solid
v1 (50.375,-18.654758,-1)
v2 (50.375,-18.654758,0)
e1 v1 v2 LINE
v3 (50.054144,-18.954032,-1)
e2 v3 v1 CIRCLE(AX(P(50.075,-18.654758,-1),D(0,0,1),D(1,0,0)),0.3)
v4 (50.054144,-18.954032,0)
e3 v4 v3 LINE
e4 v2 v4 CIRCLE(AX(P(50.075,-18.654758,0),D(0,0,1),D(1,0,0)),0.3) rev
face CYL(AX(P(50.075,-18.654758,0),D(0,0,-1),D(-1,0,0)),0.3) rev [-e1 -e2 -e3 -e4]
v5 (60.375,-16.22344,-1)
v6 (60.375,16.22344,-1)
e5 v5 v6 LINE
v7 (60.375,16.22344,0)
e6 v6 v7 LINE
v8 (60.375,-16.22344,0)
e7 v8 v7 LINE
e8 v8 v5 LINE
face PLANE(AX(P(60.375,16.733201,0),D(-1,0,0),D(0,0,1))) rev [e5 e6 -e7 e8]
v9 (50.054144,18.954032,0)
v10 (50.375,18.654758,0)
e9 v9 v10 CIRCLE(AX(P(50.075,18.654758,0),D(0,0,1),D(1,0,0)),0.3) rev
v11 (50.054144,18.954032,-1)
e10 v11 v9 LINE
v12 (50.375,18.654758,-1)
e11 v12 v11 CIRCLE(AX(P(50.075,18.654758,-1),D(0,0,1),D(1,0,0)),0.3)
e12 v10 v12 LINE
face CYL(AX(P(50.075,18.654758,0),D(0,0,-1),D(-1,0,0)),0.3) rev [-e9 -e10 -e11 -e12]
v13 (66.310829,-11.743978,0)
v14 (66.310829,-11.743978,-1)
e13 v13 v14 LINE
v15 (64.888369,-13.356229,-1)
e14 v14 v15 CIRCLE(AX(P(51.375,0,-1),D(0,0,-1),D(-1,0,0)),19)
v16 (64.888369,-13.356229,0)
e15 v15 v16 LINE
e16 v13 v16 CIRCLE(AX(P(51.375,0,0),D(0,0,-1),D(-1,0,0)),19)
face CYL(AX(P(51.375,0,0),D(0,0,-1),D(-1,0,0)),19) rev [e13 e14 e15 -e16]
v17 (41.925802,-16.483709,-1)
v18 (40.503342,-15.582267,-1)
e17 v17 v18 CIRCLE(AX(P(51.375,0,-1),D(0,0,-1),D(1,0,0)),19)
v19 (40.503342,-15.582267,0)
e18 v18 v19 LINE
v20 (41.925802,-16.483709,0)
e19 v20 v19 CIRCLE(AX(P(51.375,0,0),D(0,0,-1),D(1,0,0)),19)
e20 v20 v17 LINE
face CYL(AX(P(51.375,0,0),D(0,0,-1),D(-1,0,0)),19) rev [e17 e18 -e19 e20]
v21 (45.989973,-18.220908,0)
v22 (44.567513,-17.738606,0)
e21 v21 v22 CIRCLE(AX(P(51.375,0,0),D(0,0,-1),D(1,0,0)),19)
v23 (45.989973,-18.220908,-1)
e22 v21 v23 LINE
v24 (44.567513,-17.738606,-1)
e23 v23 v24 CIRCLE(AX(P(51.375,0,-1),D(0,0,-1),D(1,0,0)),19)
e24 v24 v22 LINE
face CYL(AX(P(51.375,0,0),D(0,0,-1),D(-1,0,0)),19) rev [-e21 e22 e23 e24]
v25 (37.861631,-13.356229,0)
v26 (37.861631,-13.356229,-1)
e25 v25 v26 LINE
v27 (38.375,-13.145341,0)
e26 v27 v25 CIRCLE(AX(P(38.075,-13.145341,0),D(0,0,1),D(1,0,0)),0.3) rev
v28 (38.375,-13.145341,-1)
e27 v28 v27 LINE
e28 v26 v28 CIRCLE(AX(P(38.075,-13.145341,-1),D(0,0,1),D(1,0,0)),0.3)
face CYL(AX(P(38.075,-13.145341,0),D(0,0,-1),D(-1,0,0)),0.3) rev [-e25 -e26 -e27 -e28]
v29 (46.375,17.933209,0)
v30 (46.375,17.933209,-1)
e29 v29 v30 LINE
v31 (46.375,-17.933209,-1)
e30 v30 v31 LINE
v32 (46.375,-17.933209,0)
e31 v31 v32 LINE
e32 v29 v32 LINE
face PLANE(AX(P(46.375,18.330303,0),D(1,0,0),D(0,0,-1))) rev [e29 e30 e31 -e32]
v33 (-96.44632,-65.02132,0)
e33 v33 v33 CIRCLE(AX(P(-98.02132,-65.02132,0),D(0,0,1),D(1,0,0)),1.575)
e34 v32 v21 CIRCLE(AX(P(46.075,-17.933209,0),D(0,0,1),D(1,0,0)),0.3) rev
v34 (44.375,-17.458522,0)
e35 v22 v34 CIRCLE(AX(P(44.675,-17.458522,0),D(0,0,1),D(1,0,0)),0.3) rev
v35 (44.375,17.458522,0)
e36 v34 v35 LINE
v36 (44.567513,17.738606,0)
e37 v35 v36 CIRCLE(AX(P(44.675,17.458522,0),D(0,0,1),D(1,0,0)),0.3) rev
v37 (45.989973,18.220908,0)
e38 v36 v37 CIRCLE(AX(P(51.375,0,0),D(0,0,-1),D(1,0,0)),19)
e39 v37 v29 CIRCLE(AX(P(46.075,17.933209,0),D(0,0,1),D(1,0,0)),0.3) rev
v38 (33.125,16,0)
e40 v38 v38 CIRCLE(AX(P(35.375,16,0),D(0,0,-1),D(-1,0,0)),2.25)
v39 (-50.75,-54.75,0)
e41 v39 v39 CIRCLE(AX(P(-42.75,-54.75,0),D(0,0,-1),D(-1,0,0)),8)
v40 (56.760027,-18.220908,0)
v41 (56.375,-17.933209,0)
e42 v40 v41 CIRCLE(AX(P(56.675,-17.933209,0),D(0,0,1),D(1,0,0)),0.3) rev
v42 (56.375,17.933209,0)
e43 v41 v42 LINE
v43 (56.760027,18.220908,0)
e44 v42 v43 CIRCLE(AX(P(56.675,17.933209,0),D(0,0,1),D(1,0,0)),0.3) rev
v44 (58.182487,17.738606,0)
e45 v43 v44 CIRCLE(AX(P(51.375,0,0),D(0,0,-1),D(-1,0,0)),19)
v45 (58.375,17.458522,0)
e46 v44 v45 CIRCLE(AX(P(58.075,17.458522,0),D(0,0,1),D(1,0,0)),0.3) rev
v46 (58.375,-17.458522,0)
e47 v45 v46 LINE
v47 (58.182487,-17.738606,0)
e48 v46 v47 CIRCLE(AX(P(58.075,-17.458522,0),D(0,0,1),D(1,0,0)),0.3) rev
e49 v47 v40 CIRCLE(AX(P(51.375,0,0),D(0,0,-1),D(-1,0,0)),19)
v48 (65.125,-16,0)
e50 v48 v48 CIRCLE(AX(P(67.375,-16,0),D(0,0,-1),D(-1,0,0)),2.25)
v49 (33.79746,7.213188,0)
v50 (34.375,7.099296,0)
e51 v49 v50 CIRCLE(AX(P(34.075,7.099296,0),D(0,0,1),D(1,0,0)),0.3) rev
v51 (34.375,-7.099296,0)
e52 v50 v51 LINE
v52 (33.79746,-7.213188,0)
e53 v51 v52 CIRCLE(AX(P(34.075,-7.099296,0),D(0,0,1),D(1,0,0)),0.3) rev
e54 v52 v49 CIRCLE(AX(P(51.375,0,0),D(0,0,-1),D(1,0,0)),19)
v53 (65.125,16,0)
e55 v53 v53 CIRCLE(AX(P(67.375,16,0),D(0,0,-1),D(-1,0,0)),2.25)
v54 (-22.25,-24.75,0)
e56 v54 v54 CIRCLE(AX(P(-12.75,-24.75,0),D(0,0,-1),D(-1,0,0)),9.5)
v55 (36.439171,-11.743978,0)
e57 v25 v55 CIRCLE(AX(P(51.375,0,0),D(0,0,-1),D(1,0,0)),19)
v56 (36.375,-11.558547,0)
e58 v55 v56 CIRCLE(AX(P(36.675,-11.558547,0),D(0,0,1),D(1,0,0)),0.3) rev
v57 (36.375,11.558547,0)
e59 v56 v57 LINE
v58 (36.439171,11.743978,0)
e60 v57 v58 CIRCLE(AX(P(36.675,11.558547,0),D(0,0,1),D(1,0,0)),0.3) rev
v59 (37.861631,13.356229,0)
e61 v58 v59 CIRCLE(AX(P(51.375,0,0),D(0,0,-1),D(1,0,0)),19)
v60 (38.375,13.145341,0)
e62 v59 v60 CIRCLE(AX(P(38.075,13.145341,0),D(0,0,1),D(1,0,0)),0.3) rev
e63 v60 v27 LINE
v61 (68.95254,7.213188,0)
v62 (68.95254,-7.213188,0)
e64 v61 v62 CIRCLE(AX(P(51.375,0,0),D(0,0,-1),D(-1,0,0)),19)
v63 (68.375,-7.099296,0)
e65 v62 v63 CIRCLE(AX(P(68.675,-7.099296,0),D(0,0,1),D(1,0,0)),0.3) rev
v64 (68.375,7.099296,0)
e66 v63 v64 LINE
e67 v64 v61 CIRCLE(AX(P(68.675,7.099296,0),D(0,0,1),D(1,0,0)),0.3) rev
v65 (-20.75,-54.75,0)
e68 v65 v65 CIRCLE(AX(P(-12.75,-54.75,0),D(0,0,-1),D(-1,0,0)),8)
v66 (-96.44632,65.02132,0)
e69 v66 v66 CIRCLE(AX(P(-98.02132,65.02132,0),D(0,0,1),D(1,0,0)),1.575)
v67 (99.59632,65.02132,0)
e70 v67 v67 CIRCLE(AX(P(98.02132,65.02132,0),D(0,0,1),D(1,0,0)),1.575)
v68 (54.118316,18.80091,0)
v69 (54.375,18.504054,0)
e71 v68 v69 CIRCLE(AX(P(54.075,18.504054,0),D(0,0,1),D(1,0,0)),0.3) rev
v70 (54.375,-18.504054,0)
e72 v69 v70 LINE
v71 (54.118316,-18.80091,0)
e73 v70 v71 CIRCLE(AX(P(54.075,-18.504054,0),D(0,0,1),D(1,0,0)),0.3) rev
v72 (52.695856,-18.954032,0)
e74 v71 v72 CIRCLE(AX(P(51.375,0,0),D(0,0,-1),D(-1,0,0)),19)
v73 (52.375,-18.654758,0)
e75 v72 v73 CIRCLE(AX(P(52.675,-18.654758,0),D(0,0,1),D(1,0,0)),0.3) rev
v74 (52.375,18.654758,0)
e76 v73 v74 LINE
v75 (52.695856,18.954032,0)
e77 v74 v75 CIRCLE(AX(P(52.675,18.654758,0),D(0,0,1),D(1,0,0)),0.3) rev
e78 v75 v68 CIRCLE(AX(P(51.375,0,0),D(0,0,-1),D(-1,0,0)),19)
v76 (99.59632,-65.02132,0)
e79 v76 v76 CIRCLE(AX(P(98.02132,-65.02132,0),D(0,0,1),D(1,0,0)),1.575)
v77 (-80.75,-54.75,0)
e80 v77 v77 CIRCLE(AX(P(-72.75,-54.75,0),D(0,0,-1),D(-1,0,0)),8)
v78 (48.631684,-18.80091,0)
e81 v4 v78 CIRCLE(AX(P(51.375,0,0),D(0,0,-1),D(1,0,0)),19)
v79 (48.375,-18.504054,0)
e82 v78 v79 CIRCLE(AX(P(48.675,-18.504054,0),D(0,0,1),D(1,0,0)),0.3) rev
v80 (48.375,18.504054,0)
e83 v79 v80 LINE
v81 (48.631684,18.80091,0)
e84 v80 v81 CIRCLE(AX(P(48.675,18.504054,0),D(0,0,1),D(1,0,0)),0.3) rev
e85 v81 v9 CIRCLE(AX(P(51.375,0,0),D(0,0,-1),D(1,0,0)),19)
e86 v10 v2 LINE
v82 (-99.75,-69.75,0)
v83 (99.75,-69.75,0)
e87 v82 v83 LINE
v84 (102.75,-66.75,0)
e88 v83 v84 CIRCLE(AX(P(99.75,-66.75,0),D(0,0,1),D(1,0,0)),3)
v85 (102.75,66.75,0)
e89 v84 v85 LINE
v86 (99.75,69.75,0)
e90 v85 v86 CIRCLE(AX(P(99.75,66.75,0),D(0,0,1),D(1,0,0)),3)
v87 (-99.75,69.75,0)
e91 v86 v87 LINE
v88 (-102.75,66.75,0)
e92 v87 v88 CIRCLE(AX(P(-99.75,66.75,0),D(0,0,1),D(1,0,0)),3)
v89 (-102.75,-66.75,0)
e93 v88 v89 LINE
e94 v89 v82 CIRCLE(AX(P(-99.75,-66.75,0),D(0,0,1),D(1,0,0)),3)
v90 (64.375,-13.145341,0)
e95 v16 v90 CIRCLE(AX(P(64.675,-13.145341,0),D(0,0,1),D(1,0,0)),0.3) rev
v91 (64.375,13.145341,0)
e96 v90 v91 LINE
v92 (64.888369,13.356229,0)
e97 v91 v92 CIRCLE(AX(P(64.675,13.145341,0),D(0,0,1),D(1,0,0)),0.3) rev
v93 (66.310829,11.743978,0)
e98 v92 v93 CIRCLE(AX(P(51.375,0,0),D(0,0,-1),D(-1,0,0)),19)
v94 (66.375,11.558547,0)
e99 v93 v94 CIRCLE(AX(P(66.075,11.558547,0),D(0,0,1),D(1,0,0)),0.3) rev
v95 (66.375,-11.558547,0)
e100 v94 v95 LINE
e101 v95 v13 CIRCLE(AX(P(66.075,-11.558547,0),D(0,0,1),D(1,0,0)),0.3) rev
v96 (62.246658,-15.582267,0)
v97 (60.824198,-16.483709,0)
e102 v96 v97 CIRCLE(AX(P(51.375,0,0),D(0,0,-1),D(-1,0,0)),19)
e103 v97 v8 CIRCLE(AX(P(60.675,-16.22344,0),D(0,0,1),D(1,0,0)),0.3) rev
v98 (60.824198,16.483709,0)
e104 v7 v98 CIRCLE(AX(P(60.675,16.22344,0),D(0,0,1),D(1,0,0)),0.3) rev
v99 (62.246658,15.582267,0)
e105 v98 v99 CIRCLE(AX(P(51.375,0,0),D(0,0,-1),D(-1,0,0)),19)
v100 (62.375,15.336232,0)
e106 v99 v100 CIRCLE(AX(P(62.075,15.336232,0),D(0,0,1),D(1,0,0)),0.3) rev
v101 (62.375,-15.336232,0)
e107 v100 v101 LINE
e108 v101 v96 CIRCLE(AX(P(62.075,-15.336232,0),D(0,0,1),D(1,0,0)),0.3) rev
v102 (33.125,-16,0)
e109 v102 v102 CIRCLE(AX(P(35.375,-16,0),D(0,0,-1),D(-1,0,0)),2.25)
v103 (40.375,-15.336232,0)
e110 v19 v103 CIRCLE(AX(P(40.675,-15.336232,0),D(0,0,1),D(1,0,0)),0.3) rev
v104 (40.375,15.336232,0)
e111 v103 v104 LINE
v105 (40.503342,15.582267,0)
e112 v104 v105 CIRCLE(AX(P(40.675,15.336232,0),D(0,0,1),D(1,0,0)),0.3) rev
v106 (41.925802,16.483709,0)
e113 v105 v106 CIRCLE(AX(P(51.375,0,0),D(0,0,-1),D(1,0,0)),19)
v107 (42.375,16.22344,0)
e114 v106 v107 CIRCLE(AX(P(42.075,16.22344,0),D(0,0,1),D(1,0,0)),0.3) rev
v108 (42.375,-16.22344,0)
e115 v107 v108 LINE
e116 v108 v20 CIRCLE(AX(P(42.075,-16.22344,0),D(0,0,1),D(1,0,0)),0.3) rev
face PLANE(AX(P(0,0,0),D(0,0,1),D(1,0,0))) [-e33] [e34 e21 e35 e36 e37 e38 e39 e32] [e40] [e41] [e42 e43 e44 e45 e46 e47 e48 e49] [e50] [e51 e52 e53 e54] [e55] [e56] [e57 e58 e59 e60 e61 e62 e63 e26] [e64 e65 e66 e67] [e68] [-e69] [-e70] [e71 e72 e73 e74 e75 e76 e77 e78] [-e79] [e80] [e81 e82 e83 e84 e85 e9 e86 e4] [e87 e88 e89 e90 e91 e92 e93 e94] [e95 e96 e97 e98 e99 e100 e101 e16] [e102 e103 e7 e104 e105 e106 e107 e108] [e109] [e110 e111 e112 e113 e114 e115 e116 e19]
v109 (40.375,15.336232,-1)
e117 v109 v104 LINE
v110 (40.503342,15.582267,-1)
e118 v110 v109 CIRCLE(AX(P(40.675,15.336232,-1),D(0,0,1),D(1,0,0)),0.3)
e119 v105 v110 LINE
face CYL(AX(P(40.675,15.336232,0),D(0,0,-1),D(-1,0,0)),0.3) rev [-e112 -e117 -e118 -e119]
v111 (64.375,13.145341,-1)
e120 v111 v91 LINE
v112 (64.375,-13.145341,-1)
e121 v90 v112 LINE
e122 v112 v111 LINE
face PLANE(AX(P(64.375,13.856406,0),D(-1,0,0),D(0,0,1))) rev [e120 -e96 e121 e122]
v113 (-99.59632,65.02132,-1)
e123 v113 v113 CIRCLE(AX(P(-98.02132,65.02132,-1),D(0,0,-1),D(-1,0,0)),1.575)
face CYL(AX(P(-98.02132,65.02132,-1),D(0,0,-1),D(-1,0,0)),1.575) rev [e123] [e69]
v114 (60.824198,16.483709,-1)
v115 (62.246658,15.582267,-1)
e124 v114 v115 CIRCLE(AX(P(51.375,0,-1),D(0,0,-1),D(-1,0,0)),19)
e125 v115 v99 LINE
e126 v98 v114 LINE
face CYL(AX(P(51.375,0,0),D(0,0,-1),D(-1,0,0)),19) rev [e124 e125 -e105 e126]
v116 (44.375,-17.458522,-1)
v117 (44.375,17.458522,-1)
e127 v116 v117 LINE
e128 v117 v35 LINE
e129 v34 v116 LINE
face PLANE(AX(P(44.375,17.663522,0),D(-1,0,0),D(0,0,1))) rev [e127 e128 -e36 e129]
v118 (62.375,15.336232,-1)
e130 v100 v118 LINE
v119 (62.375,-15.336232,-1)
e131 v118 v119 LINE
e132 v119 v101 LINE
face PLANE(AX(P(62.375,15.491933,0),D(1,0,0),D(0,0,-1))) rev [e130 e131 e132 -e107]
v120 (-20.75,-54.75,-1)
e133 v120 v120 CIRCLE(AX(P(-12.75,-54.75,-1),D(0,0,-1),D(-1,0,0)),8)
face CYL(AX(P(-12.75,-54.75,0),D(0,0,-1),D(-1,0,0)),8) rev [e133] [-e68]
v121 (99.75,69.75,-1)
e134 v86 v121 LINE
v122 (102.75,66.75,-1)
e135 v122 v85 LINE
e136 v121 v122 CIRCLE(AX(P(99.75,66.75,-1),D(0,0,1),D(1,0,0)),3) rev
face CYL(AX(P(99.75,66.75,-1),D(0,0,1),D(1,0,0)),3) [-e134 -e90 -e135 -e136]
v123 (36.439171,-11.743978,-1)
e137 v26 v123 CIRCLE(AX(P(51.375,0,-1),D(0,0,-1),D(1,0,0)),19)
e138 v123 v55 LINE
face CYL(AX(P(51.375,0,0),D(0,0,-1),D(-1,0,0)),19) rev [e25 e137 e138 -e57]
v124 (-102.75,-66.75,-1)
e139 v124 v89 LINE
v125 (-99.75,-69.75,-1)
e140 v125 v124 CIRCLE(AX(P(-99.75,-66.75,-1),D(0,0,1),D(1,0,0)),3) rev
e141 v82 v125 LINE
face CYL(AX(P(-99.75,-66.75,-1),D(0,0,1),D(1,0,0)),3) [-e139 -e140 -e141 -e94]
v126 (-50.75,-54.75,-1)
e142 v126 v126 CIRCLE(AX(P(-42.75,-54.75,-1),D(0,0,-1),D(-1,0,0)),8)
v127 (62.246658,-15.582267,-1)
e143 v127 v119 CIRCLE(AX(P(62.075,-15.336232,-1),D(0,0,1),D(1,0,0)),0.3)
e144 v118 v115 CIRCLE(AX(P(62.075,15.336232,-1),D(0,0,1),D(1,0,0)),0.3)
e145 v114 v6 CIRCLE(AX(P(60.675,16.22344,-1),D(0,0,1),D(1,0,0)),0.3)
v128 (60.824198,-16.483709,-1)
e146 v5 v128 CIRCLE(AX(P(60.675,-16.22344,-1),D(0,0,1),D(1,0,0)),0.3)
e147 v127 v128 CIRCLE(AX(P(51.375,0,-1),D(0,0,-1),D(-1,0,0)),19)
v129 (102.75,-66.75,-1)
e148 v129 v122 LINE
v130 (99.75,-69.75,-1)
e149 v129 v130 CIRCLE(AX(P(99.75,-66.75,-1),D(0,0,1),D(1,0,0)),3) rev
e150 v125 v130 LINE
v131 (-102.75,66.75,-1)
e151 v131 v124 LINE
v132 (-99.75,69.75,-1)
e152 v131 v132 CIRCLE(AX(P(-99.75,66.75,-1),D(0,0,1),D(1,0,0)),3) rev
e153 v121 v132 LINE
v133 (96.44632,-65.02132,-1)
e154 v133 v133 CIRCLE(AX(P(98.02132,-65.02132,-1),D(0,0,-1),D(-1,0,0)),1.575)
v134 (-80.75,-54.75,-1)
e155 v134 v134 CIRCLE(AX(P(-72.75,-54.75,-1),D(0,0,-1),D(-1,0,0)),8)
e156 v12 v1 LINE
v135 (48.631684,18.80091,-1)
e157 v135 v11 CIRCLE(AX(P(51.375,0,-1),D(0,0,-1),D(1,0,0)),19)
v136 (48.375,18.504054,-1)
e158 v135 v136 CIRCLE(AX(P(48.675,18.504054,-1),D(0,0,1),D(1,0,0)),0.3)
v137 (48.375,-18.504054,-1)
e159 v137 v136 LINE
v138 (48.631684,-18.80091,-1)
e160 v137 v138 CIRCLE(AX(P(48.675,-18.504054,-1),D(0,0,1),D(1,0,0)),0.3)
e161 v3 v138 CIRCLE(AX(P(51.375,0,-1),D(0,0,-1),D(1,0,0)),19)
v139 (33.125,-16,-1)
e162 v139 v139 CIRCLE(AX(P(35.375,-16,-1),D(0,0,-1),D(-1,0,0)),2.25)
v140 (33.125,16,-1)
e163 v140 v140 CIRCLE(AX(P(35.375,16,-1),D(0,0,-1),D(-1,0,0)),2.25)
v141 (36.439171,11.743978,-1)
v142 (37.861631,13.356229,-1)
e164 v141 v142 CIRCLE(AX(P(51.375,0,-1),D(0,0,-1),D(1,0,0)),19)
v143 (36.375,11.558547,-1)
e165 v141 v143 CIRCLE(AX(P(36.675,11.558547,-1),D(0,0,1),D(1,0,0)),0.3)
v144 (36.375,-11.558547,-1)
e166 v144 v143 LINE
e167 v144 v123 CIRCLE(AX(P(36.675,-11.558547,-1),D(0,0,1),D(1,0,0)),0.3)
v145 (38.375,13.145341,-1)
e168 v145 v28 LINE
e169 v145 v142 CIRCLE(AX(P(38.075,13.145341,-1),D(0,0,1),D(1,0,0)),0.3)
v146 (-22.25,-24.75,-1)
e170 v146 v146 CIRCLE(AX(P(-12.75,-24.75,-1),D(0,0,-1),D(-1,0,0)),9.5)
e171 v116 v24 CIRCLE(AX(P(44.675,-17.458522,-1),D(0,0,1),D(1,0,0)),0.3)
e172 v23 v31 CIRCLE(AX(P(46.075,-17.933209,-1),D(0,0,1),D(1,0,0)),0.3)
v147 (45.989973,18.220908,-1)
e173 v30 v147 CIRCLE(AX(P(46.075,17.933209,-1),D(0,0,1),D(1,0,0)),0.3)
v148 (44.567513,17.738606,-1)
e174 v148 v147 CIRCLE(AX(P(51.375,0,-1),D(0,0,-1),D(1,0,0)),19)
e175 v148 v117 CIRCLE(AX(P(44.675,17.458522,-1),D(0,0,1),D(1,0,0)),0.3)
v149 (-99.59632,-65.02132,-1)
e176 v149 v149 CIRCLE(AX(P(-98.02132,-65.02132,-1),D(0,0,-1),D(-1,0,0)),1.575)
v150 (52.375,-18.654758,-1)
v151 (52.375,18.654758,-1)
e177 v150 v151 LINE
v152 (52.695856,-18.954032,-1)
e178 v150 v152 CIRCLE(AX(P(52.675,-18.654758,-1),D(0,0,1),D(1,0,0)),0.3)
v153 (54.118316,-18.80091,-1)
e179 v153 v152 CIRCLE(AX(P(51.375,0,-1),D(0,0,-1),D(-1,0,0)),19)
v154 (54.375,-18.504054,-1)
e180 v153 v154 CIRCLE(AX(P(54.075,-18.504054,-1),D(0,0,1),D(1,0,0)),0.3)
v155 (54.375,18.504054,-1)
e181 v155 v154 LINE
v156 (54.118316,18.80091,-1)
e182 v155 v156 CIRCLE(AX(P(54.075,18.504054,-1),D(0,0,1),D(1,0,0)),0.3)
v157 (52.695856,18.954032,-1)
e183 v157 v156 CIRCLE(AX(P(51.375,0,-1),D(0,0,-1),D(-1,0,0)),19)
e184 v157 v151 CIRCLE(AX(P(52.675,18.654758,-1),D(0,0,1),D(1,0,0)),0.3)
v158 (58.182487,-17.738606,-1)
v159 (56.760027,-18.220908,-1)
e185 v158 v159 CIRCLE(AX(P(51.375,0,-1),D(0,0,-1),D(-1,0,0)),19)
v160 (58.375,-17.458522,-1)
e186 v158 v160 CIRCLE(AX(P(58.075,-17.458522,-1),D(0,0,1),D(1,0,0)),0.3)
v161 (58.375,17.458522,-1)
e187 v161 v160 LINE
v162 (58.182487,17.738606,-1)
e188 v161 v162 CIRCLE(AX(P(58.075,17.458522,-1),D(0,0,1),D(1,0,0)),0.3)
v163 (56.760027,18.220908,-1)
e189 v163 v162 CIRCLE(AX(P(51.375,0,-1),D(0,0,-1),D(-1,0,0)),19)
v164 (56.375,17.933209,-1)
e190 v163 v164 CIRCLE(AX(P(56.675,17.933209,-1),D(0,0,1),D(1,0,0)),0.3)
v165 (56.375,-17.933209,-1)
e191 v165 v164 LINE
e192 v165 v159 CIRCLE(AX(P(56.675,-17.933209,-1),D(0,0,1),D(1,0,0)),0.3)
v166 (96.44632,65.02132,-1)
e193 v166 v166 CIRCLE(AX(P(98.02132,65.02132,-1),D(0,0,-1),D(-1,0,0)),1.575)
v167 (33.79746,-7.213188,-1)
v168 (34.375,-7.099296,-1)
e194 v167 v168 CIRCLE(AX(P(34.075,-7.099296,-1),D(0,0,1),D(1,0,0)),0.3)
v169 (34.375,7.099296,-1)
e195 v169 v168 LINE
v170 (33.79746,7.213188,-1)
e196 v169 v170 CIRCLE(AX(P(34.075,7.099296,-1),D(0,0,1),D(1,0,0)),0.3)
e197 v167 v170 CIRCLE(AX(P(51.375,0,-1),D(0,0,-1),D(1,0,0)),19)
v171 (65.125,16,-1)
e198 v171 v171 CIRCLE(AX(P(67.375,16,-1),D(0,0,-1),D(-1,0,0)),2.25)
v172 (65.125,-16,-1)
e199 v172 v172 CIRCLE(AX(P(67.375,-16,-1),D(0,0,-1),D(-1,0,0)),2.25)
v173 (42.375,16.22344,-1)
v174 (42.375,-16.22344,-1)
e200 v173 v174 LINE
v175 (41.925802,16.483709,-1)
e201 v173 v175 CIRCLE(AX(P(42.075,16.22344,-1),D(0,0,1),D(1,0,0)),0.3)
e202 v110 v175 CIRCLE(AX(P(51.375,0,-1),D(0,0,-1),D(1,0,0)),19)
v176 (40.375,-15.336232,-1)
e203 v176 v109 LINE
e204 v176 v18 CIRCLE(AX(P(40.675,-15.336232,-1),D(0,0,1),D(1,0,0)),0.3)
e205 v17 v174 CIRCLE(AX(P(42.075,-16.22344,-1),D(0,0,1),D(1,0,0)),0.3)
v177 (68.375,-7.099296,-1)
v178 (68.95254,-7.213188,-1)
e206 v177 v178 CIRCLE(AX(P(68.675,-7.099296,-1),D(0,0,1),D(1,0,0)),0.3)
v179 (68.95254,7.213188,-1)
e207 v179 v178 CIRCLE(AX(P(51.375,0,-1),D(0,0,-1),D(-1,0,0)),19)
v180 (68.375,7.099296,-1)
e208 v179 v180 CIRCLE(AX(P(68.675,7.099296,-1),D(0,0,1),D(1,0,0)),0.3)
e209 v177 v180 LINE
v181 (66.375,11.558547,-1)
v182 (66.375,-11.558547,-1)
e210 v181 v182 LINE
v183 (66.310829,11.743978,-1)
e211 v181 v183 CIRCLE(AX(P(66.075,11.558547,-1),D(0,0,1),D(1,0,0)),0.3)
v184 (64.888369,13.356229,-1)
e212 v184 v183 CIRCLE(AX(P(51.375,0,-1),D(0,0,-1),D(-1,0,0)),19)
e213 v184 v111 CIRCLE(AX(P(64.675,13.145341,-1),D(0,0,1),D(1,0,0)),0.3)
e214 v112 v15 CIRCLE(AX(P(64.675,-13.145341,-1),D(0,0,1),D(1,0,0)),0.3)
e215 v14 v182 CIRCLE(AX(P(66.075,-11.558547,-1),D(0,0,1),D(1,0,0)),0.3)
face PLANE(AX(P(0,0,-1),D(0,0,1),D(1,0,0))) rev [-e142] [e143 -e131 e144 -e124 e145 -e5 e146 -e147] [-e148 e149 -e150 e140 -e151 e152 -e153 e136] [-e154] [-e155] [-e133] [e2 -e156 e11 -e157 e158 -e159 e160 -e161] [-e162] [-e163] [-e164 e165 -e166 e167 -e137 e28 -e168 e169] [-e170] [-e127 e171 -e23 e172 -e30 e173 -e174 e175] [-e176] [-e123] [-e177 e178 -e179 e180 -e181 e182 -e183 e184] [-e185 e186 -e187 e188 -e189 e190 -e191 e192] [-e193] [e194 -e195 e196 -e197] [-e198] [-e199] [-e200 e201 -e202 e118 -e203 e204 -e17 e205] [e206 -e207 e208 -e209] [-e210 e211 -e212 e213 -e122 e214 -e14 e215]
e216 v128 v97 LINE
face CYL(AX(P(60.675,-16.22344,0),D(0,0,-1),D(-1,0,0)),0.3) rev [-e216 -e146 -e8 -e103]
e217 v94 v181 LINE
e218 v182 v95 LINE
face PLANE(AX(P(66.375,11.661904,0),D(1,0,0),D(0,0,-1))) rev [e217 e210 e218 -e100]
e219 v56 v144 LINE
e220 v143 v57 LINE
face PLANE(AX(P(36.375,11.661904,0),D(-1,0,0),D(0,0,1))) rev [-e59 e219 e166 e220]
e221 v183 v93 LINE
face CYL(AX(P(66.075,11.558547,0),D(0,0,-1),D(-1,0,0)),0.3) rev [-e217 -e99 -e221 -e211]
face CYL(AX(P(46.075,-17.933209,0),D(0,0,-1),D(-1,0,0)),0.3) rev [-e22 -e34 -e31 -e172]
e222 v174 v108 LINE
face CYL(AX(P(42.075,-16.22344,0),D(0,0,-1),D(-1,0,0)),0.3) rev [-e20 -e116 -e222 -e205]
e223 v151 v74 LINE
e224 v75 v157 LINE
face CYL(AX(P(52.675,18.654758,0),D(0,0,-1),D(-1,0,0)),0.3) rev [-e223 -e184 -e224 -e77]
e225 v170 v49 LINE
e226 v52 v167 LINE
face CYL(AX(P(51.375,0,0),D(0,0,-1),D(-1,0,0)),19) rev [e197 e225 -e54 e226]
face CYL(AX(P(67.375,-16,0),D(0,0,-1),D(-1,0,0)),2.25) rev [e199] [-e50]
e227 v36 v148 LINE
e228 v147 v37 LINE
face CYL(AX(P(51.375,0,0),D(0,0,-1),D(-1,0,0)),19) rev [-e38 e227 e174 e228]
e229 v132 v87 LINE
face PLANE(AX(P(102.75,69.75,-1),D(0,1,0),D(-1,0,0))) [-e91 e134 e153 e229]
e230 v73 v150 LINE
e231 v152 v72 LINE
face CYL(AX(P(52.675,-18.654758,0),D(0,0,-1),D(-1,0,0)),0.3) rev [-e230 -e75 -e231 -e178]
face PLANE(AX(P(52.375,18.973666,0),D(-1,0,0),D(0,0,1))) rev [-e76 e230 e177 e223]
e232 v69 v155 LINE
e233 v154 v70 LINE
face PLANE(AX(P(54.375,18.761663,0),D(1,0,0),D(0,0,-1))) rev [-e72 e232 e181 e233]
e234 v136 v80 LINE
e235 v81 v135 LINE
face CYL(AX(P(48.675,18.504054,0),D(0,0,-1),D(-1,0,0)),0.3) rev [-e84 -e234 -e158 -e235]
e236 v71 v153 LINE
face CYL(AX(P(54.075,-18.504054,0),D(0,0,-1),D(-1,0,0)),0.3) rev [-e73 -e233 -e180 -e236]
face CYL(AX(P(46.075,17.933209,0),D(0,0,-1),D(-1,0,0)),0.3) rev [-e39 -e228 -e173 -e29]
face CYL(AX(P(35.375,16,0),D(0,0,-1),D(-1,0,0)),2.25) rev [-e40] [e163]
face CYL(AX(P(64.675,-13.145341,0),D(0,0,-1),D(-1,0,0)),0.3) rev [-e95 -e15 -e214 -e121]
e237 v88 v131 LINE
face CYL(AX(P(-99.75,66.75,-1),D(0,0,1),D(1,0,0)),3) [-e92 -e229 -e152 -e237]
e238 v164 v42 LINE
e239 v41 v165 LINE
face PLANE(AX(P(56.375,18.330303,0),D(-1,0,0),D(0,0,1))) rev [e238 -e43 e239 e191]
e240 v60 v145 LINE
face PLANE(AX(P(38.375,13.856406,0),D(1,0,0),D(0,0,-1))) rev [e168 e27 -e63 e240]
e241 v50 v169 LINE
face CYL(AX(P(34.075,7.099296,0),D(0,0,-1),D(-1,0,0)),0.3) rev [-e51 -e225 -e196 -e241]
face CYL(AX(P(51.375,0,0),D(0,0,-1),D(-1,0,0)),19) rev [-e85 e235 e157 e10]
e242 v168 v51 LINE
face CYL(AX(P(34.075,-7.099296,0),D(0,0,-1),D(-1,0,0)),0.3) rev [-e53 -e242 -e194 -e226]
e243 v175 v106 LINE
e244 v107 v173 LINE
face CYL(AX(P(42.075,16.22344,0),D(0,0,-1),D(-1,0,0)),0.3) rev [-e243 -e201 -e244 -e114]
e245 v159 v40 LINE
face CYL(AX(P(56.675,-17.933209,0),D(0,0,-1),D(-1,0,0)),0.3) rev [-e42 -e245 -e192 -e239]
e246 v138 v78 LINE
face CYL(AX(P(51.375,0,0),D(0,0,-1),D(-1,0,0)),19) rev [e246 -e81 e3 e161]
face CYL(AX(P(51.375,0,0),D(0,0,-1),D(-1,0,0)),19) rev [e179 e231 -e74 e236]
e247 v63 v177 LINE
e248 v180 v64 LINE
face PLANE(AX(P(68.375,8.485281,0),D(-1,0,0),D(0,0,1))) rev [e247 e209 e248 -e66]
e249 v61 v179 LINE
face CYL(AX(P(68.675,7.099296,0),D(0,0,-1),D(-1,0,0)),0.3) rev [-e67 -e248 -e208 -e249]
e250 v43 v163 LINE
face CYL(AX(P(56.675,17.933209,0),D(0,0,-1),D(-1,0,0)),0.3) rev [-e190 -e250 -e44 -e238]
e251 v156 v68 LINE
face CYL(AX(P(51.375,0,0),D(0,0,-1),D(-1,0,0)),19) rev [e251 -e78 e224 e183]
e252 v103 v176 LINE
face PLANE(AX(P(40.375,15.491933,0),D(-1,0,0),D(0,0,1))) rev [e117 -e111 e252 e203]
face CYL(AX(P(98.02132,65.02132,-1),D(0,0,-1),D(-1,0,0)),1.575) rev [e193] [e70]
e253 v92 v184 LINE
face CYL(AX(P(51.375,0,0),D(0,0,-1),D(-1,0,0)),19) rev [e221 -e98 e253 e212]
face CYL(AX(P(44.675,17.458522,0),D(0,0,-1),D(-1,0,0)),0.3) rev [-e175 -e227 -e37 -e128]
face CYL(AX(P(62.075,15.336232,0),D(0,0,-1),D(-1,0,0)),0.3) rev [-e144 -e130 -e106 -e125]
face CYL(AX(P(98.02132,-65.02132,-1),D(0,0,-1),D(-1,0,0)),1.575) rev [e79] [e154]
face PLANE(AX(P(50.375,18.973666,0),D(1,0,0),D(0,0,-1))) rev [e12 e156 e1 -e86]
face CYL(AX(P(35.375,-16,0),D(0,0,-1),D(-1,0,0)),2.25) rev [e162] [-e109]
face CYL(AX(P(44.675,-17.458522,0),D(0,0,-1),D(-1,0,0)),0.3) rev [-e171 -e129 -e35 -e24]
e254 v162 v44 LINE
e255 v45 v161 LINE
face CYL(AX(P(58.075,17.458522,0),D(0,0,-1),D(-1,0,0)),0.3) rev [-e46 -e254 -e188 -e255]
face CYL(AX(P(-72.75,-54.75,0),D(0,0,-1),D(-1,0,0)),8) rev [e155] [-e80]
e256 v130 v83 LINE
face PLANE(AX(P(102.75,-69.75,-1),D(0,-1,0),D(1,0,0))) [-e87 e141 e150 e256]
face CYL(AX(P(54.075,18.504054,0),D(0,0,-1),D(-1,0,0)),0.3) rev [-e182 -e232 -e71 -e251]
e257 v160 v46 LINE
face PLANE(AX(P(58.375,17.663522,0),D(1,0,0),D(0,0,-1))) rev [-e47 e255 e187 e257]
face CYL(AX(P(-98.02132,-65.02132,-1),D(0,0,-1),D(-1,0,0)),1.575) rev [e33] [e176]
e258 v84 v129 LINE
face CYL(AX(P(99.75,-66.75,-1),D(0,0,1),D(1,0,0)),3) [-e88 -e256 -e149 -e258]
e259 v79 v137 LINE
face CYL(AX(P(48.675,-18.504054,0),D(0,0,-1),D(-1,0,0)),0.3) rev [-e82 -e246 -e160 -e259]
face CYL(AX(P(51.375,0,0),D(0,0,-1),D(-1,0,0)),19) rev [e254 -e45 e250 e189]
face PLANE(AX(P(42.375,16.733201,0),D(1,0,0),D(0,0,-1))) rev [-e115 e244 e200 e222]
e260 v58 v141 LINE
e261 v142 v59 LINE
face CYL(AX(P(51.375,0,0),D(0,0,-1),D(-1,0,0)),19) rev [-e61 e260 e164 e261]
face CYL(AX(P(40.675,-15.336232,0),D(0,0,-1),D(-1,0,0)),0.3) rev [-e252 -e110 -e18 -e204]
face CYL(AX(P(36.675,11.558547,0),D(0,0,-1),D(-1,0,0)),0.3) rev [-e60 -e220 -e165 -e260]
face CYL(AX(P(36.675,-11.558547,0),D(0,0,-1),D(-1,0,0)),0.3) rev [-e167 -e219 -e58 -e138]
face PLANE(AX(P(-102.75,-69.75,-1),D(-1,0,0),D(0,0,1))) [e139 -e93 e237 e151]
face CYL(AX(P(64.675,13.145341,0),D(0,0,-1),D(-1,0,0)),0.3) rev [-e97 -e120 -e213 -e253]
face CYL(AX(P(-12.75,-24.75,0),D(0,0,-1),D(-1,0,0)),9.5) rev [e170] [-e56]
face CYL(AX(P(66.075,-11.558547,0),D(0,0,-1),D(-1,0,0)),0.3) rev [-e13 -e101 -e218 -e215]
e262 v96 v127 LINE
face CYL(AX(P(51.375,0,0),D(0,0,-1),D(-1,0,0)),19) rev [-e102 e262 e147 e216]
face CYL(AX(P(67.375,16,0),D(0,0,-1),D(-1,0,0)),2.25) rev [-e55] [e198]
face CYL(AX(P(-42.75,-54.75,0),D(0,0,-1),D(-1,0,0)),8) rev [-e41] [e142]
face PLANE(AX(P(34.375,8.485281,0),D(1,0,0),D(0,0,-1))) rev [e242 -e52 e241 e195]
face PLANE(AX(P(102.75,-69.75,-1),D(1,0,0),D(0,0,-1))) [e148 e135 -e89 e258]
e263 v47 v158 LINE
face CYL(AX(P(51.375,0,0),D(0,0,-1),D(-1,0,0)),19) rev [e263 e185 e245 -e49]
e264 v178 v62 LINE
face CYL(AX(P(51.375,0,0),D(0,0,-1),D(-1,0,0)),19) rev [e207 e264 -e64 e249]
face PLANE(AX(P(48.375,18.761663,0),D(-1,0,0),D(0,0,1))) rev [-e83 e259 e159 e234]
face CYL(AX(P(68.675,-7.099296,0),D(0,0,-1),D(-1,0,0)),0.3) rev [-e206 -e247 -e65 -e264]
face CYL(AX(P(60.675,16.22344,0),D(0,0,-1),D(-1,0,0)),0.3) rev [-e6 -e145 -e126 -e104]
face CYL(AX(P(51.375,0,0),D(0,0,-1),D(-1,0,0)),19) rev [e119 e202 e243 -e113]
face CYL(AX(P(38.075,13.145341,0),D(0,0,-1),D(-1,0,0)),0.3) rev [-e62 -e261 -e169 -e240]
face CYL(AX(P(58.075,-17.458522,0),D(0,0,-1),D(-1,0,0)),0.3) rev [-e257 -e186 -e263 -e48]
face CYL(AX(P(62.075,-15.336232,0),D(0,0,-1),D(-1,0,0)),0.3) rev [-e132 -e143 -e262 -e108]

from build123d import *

# Parameters (mm, degrees)
SKETCH_2_W             = 205.5
SKETCH_2_H             = 139.5
SM_BASE_FLANGE_1_DEPTH = 1
FILLET_1_R             = 3
HOLE_WIZARD_M31_D      = 3.15
HOLE_WIZARD_M31_DEPTH  = 8.5
HOLE_WIZARD_M31_TIP    = 0.946355475
SKETCH_9_R             = 2.25
CUT_EXTRUDE_3_DEPTH    = 1
CUT_EXTRUDE_4_DEPTH    = 1
SKETCH_8_R             = 8
CUT_EXTRUDE_1_DEPTH    = 10
SKETCH_10_R            = 9.5
CUT_EXTRUDE_2_DEPTH    = 1
FILLET_2_R             = 0.3


# Sheet-metal steps are written as plain solids
with BuildPart() as part:
    # Sketch 2 → Базовая кромка1 (new body)
    with BuildSketch(Plane.XY):
        Rectangle(SKETCH_2_W, SKETCH_2_H)
    extrude(amount=-SM_BASE_FLANGE_1_DEPTH)

    # Скругление1
    fillet_1_edges = [part.edges().sort_by_distance(p)[0] for p in [
        (-102.75, 69.75, -0.5),
        (102.75, 69.75, -0.5),
        (102.75, -69.75, -0.5),
        (-102.75, -69.75, -0.5),
    ]]
    fillet(fillet_1_edges, radius=FILLET_1_R)

    # Сверло под метчик  спиральное M31
    with Locations(Plane(origin=(0, 0, -1), x_dir=(-1, 0, 0), z_dir=(0, 0, -1))):
        with Locations((-98.021320344, 65.021320344), (98.021320344, 65.021320344), (98.021320344, -65.021320344), (-98.021320344, -65.021320344)):
            Hole(HOLE_WIZARD_M31_D / 2, depth=HOLE_WIZARD_M31_DEPTH)
            with Locations((0, 0, -(HOLE_WIZARD_M31_DEPTH + HOLE_WIZARD_M31_TIP / 2))):  # 118° drill point
                Cone(0, HOLE_WIZARD_M31_D / 2, HOLE_WIZARD_M31_TIP, mode=Mode.SUBTRACT)

    # Эскиз9 → Вырез-Вытянуть3 (cut)
    with BuildSketch(Plane(origin=(0, 0, -1), x_dir=(-1, 0, 0), z_dir=(0, 0, -1))):
        with Locations((-67.375, 16)):
            Circle(SKETCH_9_R)
        with Locations((-35.375, 16)):
            Circle(SKETCH_9_R)
        with Locations((-35.375, -16)):
            Circle(SKETCH_9_R)
        with Locations((-67.375, -16)):
            Circle(SKETCH_9_R)
    extrude(amount=-CUT_EXTRUDE_3_DEPTH, mode=Mode.SUBTRACT)

    # Эскиз11 → Вырез-Вытянуть4 (cut)
    with BuildSketch(Plane(origin=(0, 0, -1), x_dir=(-1, 0, 0), z_dir=(0, 0, -1))):
        with BuildLine():
            Line((-68.375, 8.485281374), (-68.375, -8.485281374))
            ThreePointArc((-68.375, -8.485281374), (-70.375, 0), (-68.375, 8.485281374))
        make_face()
        with BuildLine():
            Line((-66.375, 11.66190379), (-66.375, -11.66190379))
            ThreePointArc((-66.375, -11.66190379), (-65.41793276, -12.798282678), (-64.375, -13.856406461))
            Line((-64.375, -13.856406461), (-64.375, 13.856406461))
            ThreePointArc((-64.375, 13.856406461), (-65.41793276, 12.798282678), (-66.375, 11.66190379))
        make_face()
        with BuildLine():
            Line((-52.375, 18.973665961), (-52.375, -18.973665961))
            ThreePointArc((-52.375, -18.973665961), (-53.377807107, -18.894146281), (-54.375, -18.761663039))
            Line((-54.375, -18.761663039), (-54.375, 18.761663039))
            ThreePointArc((-54.375, 18.761663039), (-53.377807107, 18.894146281), (-52.375, 18.973665961))
        make_face()
        with BuildLine():
            Line((-56.375, 18.33030278), (-56.375, -18.33030278))
            ThreePointArc((-56.375, -18.33030278), (-57.384255298, -18.024673388), (-58.375, -17.663521733))
            Line((-58.375, -17.663521733), (-58.375, 17.663521733))
            ThreePointArc((-58.375, 17.663521733), (-57.384255298, 18.024673388), (-56.375, 18.33030278))
        make_face()
        with BuildLine():
            Line((-60.375, 16.733200531), (-60.375, -16.733200531))
            ThreePointArc((-60.375, -16.733200531), (-61.394240791, -16.143568811), (-62.375, -15.491933385))
            Line((-62.375, -15.491933385), (-62.375, 15.491933385))
            ThreePointArc((-62.375, 15.491933385), (-61.394240791, 16.143568811), (-60.375, 16.733200531))
        make_face()
        with BuildLine():
            Line((-40.375, 15.491933385), (-40.375, -15.491933385))
            ThreePointArc((-40.375, -15.491933385), (-41.355759209, -16.143568811), (-42.375, -16.733200531))
            Line((-42.375, -16.733200531), (-42.375, 16.733200531))
            ThreePointArc((-42.375, 16.733200531), (-41.355759209, 16.143568811), (-40.375, 15.491933385))
        make_face()
        with BuildLine():
            Line((-44.375, 17.663521733), (-44.375, -17.663521733))
            ThreePointArc((-44.375, -17.663521733), (-45.365744702, -18.024673388), (-46.375, -18.33030278))
            Line((-46.375, -18.33030278), (-46.375, 18.33030278))
            ThreePointArc((-46.375, 18.33030278), (-45.365744702, 18.024673388), (-44.375, 17.663521733))
        make_face()
        with BuildLine():
            Line((-48.375, 18.761663039), (-48.375, -18.761663039))
            ThreePointArc((-48.375, -18.761663039), (-49.372192893, -18.894146281), (-50.375, -18.973665961))
            Line((-50.375, -18.973665961), (-50.375, 18.973665961))
            ThreePointArc((-50.375, 18.973665961), (-49.372192893, 18.894146281), (-48.375, 18.761663039))
        make_face()
        with BuildLine():
            Line((-38.375, 13.856406461), (-38.375, -13.856406461))
            ThreePointArc((-38.375, -13.856406461), (-37.33206724, -12.798282678), (-36.375, -11.66190379))
            Line((-36.375, -11.66190379), (-36.375, 11.66190379))
            ThreePointArc((-36.375, 11.66190379), (-37.33206724, 12.798282678), (-38.375, 13.856406461))
        make_face()
        with BuildLine():
            Line((-34.375, 8.485281374), (-34.375, -8.485281374))
            ThreePointArc((-34.375, -8.485281374), (-32.375, 0), (-34.375, 8.485281374))
        make_face()
    extrude(amount=-CUT_EXTRUDE_4_DEPTH, mode=Mode.SUBTRACT)

    # Эскиз8 → Вырез-Вытянуть1 (cut)
    with BuildSketch(Plane(origin=(0, 0, -1), x_dir=(-1, 0, 0), z_dir=(0, 0, -1))):
        with Locations((42.75, -54.75)):
            Circle(SKETCH_8_R)
        with Locations((72.75, -54.75)):
            Circle(SKETCH_8_R)
        with Locations((12.75, -54.75)):
            Circle(SKETCH_8_R)
    extrude(amount=-CUT_EXTRUDE_1_DEPTH, mode=Mode.SUBTRACT)

    # Эскиз10 → Вырез-Вытянуть2 (cut)
    with BuildSketch(Plane(origin=(0, 0, -1), x_dir=(-1, 0, 0), z_dir=(0, 0, -1))):
        with Locations((12.75, -24.75)):
            Circle(SKETCH_10_R)
    extrude(amount=-CUT_EXTRUDE_2_DEPTH, mode=Mode.SUBTRACT)

    # Скругление2
    fillet_2_edges = [part.edges().sort_by_distance(p)[0] for p in [
        (34.375, 8.485281374, -0.5),
        (34.375, -8.485281374, -0.5),
        (68.375, -8.485281374, -0.5),
        (68.375, 8.485281374, -0.5),
        (66.375, 11.66190379, -0.5),
        (64.375, 13.856406461, -0.5),
        (64.375, -13.856406461, -0.5),
        (66.375, -11.66190379, -0.5),
        (54.375, 18.761663039, -0.5),
        (52.375, 18.973665961, -0.5),
        (52.375, -18.973665961, -0.5),
        (54.375, -18.761663039, -0.5),
        (58.375, 17.663521733, -0.5),
        (56.375, 18.33030278, -0.5),
        (56.375, -18.33030278, -0.5),
        (58.375, -17.663521733, -0.5),
        (62.375, 15.491933385, -0.5),
        (60.375, 16.733200531, -0.5),
        (60.375, -16.733200531, -0.5),
        (62.375, -15.491933385, -0.5),
        (44.375, -17.663521733, -0.5),
        (46.375, -18.33030278, -0.5),
        (46.375, 18.33030278, -0.5),
        (44.375, 17.663521733, -0.5),
        (40.375, -15.491933385, -0.5),
        (42.375, -16.733200531, -0.5),
        (42.375, 16.733200531, -0.5),
        (40.375, 15.491933385, -0.5),
        (36.375, -11.66190379, -0.5),
        (38.375, -13.856406461, -0.5),
        (38.375, 13.856406461, -0.5),
        (36.375, 11.66190379, -0.5),
        (48.375, -18.761663039, -0.5),
        (50.375, -18.973665961, -0.5),
        (50.375, 18.973665961, -0.5),
        (48.375, 18.761663039, -0.5),
    ]]
    fillet(fillet_2_edges, radius=FILLET_2_R)


solid = part.part
